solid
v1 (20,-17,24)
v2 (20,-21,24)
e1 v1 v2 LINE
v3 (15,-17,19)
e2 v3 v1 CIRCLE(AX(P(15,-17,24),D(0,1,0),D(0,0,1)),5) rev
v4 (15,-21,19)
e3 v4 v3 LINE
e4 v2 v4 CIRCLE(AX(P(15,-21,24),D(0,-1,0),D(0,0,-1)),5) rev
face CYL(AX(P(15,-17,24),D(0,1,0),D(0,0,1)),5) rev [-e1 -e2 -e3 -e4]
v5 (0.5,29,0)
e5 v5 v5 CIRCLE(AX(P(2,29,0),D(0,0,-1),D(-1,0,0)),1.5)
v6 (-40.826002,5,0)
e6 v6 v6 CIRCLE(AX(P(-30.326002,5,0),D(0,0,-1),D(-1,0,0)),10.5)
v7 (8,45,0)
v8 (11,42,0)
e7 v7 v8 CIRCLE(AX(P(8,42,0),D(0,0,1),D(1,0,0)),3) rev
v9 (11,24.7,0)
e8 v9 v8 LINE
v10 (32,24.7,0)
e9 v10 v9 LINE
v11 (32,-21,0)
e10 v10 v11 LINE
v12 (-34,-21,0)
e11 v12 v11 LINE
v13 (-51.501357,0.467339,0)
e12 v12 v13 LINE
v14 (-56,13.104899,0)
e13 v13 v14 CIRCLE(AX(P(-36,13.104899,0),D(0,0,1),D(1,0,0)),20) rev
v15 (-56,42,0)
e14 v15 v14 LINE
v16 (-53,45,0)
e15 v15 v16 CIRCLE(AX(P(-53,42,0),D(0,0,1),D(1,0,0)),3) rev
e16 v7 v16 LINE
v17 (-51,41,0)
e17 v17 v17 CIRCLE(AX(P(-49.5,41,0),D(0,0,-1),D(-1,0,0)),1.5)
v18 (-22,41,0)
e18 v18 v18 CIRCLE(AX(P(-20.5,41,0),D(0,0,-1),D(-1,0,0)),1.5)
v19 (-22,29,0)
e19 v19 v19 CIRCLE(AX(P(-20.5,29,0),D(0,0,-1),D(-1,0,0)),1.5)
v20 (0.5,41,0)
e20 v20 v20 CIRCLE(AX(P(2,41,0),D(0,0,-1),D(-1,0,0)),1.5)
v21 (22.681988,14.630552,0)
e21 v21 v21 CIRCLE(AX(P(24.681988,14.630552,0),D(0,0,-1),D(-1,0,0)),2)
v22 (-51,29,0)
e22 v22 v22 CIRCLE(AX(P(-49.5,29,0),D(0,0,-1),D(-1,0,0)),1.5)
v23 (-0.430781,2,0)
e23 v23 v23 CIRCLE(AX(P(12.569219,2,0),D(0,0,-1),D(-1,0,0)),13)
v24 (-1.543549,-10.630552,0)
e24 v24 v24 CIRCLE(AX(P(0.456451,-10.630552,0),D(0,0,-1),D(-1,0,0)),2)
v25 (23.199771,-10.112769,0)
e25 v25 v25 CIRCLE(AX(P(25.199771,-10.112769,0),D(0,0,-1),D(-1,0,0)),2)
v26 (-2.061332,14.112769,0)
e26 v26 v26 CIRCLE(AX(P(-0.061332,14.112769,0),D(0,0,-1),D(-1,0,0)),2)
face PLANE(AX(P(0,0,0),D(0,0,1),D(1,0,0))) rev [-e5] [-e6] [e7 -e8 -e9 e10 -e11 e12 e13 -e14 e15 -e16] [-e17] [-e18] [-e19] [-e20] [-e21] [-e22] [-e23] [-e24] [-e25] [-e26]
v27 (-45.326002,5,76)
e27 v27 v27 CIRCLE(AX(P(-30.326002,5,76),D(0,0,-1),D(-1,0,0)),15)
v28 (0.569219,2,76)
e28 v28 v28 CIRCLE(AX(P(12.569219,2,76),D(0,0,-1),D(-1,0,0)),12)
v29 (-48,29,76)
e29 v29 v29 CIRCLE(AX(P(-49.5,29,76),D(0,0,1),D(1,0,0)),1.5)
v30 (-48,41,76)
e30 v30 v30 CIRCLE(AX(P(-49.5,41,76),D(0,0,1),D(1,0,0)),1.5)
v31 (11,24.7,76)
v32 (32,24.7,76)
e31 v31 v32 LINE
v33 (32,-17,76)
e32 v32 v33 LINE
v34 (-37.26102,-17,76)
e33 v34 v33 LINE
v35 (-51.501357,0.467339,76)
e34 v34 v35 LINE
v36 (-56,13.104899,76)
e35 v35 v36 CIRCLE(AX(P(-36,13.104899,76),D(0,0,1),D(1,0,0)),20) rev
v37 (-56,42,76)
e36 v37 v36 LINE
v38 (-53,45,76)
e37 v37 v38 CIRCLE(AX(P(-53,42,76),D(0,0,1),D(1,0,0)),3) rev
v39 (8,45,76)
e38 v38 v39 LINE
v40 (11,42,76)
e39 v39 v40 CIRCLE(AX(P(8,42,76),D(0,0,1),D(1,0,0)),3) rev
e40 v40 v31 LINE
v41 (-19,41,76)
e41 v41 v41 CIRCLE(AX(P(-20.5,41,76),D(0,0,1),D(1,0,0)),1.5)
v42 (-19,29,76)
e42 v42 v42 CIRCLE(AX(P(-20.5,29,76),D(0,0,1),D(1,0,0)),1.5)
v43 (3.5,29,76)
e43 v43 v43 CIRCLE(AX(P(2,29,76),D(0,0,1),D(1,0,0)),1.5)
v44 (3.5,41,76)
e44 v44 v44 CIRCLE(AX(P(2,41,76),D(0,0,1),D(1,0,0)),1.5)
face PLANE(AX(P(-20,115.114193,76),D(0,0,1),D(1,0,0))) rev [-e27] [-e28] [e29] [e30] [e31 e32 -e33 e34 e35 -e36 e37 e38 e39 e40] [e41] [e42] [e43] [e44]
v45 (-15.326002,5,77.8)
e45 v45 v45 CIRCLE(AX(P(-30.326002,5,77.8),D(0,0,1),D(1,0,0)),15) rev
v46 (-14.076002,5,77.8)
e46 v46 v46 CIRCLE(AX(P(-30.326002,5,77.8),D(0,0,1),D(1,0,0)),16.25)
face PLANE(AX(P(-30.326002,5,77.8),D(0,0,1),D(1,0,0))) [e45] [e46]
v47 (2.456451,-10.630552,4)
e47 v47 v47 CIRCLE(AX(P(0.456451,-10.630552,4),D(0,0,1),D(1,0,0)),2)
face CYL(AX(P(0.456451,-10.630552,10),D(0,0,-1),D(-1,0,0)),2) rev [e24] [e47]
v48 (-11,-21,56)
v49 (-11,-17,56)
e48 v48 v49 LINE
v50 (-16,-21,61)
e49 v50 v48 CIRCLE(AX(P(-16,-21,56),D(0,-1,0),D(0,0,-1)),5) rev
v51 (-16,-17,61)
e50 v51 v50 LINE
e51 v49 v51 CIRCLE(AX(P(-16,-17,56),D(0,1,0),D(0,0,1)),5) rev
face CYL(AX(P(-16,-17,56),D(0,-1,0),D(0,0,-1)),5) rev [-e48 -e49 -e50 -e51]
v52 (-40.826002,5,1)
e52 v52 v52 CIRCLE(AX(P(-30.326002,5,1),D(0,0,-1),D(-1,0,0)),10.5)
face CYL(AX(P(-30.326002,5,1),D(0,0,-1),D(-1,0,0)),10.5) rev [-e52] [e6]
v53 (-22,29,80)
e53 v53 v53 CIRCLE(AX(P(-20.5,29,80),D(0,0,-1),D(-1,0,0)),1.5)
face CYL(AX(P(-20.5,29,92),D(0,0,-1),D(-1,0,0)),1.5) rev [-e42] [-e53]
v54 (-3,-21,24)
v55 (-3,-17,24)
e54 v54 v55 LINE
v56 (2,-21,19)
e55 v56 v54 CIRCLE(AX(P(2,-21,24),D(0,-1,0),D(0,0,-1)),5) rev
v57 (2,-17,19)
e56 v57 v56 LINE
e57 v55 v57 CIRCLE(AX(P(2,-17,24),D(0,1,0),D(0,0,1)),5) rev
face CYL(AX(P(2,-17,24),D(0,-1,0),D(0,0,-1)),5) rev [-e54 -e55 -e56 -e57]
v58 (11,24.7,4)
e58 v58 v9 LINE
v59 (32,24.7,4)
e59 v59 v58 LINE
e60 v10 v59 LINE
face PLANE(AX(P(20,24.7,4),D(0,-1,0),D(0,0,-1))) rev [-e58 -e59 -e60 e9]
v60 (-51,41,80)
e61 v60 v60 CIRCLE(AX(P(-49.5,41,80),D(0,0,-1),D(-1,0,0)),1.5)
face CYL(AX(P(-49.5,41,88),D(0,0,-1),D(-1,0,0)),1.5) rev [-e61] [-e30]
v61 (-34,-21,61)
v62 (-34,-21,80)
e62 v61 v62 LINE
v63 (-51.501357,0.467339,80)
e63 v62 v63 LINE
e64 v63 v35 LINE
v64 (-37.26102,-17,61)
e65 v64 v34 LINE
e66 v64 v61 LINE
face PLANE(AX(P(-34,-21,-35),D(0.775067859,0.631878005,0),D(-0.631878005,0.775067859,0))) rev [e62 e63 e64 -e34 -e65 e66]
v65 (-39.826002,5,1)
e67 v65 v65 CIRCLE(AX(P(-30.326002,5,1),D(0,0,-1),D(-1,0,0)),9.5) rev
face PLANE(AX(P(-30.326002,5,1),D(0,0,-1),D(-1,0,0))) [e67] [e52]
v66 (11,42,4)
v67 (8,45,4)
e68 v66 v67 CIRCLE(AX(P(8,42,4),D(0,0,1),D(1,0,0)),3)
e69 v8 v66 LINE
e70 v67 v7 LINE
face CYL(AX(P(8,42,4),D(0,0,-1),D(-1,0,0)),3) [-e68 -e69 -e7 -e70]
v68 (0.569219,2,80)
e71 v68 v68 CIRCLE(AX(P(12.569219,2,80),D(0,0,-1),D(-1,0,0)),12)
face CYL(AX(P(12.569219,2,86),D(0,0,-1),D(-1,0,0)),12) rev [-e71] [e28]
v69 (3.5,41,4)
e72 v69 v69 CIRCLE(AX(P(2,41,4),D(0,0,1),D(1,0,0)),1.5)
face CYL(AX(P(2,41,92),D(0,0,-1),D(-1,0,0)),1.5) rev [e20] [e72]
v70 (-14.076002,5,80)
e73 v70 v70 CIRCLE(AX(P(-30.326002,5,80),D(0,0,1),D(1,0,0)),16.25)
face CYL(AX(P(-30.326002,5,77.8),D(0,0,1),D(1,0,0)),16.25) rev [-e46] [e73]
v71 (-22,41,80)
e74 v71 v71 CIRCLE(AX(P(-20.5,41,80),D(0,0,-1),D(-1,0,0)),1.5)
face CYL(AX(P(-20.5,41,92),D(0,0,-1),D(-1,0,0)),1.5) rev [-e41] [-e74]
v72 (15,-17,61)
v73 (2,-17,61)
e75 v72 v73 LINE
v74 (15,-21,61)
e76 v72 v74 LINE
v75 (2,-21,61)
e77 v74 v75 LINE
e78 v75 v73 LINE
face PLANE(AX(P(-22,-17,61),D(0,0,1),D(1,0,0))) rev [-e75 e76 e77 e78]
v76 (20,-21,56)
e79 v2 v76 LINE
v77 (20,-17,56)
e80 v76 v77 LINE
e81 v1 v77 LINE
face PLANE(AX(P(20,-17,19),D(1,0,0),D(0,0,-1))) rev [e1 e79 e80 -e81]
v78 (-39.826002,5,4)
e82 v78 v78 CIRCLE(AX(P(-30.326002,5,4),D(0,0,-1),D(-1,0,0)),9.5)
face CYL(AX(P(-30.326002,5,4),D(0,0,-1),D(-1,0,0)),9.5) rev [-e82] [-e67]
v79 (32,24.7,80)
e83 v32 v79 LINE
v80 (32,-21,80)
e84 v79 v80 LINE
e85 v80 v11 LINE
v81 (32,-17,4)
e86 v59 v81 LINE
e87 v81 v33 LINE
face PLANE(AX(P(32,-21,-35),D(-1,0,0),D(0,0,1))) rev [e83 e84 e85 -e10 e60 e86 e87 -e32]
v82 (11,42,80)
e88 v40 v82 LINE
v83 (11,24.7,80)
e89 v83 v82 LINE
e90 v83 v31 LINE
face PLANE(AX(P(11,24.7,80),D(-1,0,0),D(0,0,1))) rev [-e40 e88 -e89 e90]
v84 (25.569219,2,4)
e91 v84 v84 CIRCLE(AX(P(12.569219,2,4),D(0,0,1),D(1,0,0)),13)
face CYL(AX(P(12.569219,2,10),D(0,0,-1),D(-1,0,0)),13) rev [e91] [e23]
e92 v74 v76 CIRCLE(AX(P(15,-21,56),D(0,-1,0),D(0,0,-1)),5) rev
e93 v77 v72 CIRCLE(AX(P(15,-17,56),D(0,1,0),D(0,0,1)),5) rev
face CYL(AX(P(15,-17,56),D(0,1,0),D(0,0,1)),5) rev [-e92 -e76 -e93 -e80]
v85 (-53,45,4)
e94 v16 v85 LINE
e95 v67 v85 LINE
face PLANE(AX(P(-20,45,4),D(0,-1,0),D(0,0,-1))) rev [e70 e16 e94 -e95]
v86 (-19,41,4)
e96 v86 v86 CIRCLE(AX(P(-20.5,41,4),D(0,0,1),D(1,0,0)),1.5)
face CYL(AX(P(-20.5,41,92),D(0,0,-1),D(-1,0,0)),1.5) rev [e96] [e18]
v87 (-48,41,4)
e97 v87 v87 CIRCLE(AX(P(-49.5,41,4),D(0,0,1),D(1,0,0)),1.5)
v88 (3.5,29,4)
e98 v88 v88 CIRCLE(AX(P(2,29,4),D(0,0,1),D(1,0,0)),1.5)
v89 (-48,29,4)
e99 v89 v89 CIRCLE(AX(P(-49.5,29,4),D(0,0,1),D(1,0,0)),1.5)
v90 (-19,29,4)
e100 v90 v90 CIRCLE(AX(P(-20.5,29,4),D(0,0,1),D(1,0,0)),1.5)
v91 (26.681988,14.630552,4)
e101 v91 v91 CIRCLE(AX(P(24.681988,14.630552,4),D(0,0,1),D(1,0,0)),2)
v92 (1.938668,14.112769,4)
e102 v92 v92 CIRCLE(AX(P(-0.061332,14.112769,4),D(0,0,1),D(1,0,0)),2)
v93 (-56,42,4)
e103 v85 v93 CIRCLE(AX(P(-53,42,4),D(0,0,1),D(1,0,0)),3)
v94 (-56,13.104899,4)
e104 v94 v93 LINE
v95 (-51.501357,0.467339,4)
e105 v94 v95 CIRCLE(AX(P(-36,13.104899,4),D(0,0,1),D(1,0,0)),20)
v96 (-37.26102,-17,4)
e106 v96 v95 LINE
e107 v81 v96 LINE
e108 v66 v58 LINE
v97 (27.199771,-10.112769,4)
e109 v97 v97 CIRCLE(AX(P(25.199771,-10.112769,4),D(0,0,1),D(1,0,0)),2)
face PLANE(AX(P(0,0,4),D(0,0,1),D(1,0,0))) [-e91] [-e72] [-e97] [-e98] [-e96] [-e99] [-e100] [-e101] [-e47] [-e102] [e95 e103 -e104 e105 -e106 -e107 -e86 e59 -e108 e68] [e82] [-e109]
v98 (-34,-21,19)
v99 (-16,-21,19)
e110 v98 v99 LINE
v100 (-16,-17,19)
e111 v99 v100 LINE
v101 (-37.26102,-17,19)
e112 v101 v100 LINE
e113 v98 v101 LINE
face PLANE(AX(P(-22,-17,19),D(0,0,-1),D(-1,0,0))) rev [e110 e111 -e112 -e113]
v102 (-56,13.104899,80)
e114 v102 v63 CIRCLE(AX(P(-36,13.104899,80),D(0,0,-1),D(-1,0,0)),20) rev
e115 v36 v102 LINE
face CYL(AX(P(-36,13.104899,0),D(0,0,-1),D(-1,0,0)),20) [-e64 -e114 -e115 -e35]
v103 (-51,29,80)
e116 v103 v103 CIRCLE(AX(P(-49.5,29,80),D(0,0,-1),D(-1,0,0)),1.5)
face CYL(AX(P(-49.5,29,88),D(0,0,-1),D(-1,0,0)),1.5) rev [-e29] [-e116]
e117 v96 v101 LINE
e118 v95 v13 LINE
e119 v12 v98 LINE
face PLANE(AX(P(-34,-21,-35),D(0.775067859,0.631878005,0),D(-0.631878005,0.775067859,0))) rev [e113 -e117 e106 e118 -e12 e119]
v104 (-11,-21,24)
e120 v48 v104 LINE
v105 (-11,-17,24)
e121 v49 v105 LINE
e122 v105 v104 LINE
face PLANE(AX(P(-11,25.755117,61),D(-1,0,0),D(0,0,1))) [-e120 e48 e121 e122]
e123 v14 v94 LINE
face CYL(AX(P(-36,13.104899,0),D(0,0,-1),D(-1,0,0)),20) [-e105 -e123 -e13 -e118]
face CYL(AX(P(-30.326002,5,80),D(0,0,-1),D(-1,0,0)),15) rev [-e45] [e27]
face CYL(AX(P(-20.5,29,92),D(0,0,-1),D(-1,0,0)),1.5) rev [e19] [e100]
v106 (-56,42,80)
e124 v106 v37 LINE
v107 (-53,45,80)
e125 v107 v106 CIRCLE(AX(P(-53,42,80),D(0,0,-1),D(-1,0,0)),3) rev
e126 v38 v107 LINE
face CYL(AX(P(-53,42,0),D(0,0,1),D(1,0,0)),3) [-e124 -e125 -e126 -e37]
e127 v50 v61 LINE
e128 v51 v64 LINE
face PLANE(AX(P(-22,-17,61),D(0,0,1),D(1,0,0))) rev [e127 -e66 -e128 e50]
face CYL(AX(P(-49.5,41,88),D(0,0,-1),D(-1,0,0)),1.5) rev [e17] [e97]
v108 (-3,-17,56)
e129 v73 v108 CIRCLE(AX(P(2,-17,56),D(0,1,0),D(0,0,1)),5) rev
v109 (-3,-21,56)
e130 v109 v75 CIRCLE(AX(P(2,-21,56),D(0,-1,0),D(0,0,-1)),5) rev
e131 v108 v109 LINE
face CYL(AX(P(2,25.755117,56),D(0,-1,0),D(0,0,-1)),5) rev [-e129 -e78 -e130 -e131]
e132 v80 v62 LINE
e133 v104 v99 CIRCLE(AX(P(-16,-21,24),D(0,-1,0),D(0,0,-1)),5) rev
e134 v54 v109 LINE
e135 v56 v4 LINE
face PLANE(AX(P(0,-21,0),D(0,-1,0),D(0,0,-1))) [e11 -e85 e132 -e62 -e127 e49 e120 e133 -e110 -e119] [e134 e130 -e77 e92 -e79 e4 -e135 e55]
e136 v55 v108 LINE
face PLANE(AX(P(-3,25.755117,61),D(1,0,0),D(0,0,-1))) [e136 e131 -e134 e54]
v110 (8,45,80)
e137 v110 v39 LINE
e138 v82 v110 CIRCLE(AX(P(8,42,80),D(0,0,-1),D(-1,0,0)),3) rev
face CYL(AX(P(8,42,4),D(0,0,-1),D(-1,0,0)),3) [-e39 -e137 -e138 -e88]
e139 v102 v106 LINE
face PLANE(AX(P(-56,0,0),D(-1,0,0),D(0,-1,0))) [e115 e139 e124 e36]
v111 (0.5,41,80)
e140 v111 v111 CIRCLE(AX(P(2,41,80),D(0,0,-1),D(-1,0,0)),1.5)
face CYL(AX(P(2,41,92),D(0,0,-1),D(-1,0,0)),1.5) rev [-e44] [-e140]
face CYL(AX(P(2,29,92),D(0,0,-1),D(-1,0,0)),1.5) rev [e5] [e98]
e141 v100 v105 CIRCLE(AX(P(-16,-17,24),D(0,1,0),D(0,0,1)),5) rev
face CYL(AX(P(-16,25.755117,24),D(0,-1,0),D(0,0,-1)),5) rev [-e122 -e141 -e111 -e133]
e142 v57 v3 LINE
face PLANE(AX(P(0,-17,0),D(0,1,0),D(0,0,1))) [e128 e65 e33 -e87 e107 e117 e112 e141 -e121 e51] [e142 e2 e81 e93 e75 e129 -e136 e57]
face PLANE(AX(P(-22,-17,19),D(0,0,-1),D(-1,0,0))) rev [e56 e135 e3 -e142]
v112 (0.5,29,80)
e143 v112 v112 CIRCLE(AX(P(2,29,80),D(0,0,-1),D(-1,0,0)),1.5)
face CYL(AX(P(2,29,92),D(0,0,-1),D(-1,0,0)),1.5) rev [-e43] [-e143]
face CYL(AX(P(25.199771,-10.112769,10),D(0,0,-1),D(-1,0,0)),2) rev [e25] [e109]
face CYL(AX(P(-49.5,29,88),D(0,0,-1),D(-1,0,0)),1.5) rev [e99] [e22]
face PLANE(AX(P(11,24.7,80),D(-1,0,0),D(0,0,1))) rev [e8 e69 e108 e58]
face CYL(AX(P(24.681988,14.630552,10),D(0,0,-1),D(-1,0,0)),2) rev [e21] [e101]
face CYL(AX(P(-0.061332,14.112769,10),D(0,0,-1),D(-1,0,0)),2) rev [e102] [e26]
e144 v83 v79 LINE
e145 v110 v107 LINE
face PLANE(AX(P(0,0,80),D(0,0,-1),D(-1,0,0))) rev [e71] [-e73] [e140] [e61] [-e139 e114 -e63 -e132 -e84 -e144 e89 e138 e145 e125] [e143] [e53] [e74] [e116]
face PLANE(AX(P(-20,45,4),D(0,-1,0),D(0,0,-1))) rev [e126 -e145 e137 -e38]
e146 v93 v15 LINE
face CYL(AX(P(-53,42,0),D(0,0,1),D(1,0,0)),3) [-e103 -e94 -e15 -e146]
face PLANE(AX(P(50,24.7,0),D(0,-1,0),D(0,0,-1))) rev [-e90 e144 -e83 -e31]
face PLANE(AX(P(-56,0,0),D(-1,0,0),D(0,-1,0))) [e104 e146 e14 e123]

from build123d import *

# Parameters (mm, degrees)
EXTRUDE_1_DEPTH      = 4
SKETCH_3_W           = 70
SKETCH_3_H           = 4
EXTRUDE_2_DEPTH      = 5
SKETCH_4_W           = 70
SKETCH_4_H           = 4
EXTRUDE_3_DEPTH      = 4
SKETCH_4_2_W         = 70
SKETCH_4_2_H         = 4
EXTRUDE_4_DEPTH      = 81
EXTRUDE_5_DEPTH      = 4
SKETCH_6_W           = 70
SKETCH_6_H           = 4
EXTRUDE_6_DEPTH      = 76
SKETCH_7_W           = 70
SKETCH_7_H           = 4
EXTRUDE_7_DEPTH      = 95
SKETCH_8_W           = 30
SKETCH_8_H           = 20.3
CUT_EXTRUDE_2_DEPTH  = 80
SKETCH_11_W          = 70
SKETCH_11_H          = 99
CUT_EXTRUDE_4_DEPTH  = 155
SKETCH_14_W          = 5
SKETCH_14_H          = 99
CUT_EXTRUDE_7_DEPTH  = 81.8
SKETCH_15_W          = 65
SKETCH_15_H          = 72
EXTRUDE_8_DEPTH      = 8
SKETCH_16_W          = 65
SKETCH_16_H          = 80
CUT_EXTRUDE_8_DEPTH  = 8
SKETCH_17_W          = 6
SKETCH_17_H          = 70.7
CUT_EXTRUDE_9_DEPTH  = 102
FILLET_2_R           = 3
EXTRUDE_10_DEPTH     = 33
SKETCH_22_R          = 9.5
CUT_EXTRUDE_12_DEPTH = 333
SKETCH_23_R          = 10.5
CUT_EXTRUDE_13_DEPTH = 1
SKETCH_25_R          = 1.5
CUT_EXTRUDE_15_DEPTH = 92
EXTRUDE_11_DEPTH     = 8
SKETCH_27_R          = 1.5
CUT_EXTRUDE_16_DEPTH = 88
SKETCH_28_R          = 1.5
EXTRUDE_12_DEPTH     = 4
EXTRUDE_START        = -4
SKETCH_30_R          = 1.5
EXTRUDE_13_DEPTH     = 4
FILLET_3_R           = 3
SKETCH_34_R          = 15
CUT_EXTRUDE_19_DEPTH = 10
SKETCH_46_W          = 100
SKETCH_46_H          = 72
EXTRUDE_14_DEPTH     = 14
SKETCH_47_W          = 100
SKETCH_47_H          = 80
CUT_EXTRUDE_26_DEPTH = 14
SKETCH_48_W          = 4
SKETCH_48_H          = 56.7
CUT_EXTRUDE_27_DEPTH = 97
FILLET_4_R           = 3
CUT_EXTRUDE_28_DEPTH = 82
SKETCH_51_W          = 36
SKETCH_51_H          = 36
CUT_EXTRUDE_29_DEPTH = 82
FILLET_6_R           = 5
SKETCH_52_R          = 13
SKETCH_52_R_2        = 2
CUT_EXTRUDE_30_DEPTH = 10
SKETCH_53_R          = 12
CUT_EXTRUDE_31_DEPTH = 10
SKETCH_54_W          = 74.594594595
SKETCH_54_H          = 72
EXTRUDE_15_DEPTH     = 11
SKETCH_55_W          = 72
SKETCH_55_H          = 80
CUT_EXTRUDE_32_DEPTH = 11
SKETCH_57_W          = 80
SKETCH_57_H          = 11
CUT_EXTRUDE_33_DEPTH = 14
SKETCH_58_W          = 8
SKETCH_58_H          = 45.7
CUT_EXTRUDE_34_DEPTH = 115
CUT_EXTRUDE_35_DEPTH = 115
EXTRUDE_16_DEPTH     = 80
FILLET_7_R           = 20
SKETCH_61_W          = 42
SKETCH_61_H          = 42
CUT_EXTRUDE_36_DEPTH = 4
SKETCH_63_W          = 9
SKETCH_63_H          = 20.3
CUT_EXTRUDE_37_DEPTH = 108.522090753
FILLET_9_R           = 3
SKETCH_65_R          = 9.5
EXTRUDE_17_DEPTH     = 4
SKETCH_66_R          = 15
EXTRUDE_18_DEPTH     = 4
SKETCH_67_R          = 9.5
CUT_EXTRUDE_39_DEPTH = 4
SKETCH_68_R          = 15
CUT_EXTRUDE_40_DEPTH = 4
SKETCH_69_R          = 10.5
CUT_EXTRUDE_41_DEPTH = 1
SKETCH_70_R          = 16.25
CUT_EXTRUDE_42_DEPTH = 2.2
SKETCH_71_W          = 22.207028064
SKETCH_71_H          = 42
CUT_EXTRUDE_44_DEPTH = 8.2
SKETCH_72_W          = 8
SKETCH_72_H          = 42
EXTRUDE_19_DEPTH     = 4
FILLET_10_R          = 5


with BuildPart() as part:
    # 草图1 → 凸台-拉伸1 (new body)
    with BuildSketch(Plane.XY):
        Polygon((-20, 45), (20, 45), (20, 24.7), (50, 24.7), (50, -45), (20, -45), (-20, -45), align=None)
    extrude(amount=EXTRUDE_1_DEPTH)

    # 草图3 → 凸台-拉伸2 (add)
    with BuildSketch(Plane.XZ.offset(45)):
        with Locations((15, 2)):
            Rectangle(SKETCH_3_W, SKETCH_3_H)
    extrude(amount=EXTRUDE_2_DEPTH)

    # 草图4 → 凸台-拉伸3 (add)
    with BuildSketch(Plane(origin=(0, 0, 0), x_dir=(-1, 0, 0), z_dir=(0, 0, -1))):
        with Locations((-15, -52)):
            Rectangle(SKETCH_4_W, SKETCH_4_H)
    extrude(amount=-EXTRUDE_3_DEPTH)

    # 草图4<2> → 凸台-拉伸4 (add)
    with BuildSketch(Plane(origin=(0, 0, 0), x_dir=(-1, 0, 0), z_dir=(0, 0, -1))):
        with Locations((-15, -52)):
            Rectangle(SKETCH_4_2_W, SKETCH_4_2_H)
    extrude(amount=EXTRUDE_4_DEPTH)

    # 草图5 → 凸台-拉伸5 (add)
    with BuildSketch(Plane(origin=(0, 0, -81), x_dir=(-1, 0, 0), z_dir=(0, 0, -1))):
        Polygon((-50, -50), (-50, -54), (20, -54), (20, -50), (20, 45), (-20, 45), (-20, 24.7), (-50, 24.7), align=None)
    extrude(amount=EXTRUDE_5_DEPTH)

    # 草图6 → 凸台-拉伸6 (add)
    with BuildSketch(Plane.XY.offset(4)):
        with Locations((15, -52)):
            Rectangle(SKETCH_6_W, SKETCH_6_H)
    extrude(amount=EXTRUDE_6_DEPTH)

    # 草图7 → 凸台-拉伸7 (add)
    with BuildSketch(Plane(origin=(0, -50, 0), x_dir=(1, 0, 0), z_dir=(0, 1, 0))):
        with Locations((15, -78)):
            Rectangle(SKETCH_7_W, SKETCH_7_H)
    extrude(amount=EXTRUDE_7_DEPTH)

    # 草图8 → 切除-拉伸2 (cut)
    with BuildSketch(Plane.XY.offset(80)):
        with Locations((35, 34.85)):
            Rectangle(SKETCH_8_W, SKETCH_8_H)
    extrude(amount=-CUT_EXTRUDE_2_DEPTH, mode=Mode.SUBTRACT)

    # 草图11 → 切除-拉伸4 (cut)
    with BuildSketch(Plane(origin=(0, 0, 0), x_dir=(-1, 0, 0), z_dir=(0, 0, -1))):
        with Locations((-15, -4.5)):
            Rectangle(SKETCH_11_W, SKETCH_11_H)
    extrude(amount=CUT_EXTRUDE_4_DEPTH, mode=Mode.SUBTRACT)

    # 草图14 → 切除-拉伸7 (cut)
    with BuildSketch(Plane.XY.offset(80)):
        with Locations((-17.5, -4.5)):
            Rectangle(SKETCH_14_W, SKETCH_14_H)
    extrude(amount=-CUT_EXTRUDE_7_DEPTH, mode=Mode.SUBTRACT)

    # 草图15 → 凸台-拉伸8 (add)
    with BuildSketch(Plane(origin=(0, -50, 0), x_dir=(1, 0, 0), z_dir=(0, 1, 0))):
        with Locations((17.5, -40)):
            Rectangle(SKETCH_15_W, SKETCH_15_H)
    extrude(amount=EXTRUDE_8_DEPTH)

    # 草图16 → 切除-拉伸8 (cut)
    with BuildSketch(Plane.XZ.offset(54)):
        with Locations((17.5, 40)):
            Rectangle(SKETCH_16_W, SKETCH_16_H)
    extrude(amount=-CUT_EXTRUDE_8_DEPTH, mode=Mode.SUBTRACT)

    # 草图17 → 切除-拉伸9 (cut)
    with BuildSketch(Plane(origin=(0, 0, 0), x_dir=(-1, 0, 0), z_dir=(0, 0, -1))):
        with Locations((-47, -10.65)):
            Rectangle(SKETCH_17_W, SKETCH_17_H)
    extrude(amount=-CUT_EXTRUDE_9_DEPTH, mode=Mode.SUBTRACT)

    # 圆角2
    fillet_2_edges = [part.edges().sort_by_distance(p)[0] for p in [
        (44, 24.7, 78),
        (44, 24.7, 2),
    ]]
    fillet(fillet_2_edges, radius=FILLET_2_R)

    # 草图21 → 凸台-拉伸10 (add)
    with BuildSketch(Plane.ZY.offset(15)):
        Polygon((0, -46), (80, -46), (80, 45), (76, 45), (76, -42), (4, -42), (4, 45), (0, 45), align=None)
    extrude(amount=EXTRUDE_10_DEPTH)

    # 草图22 → 切除-拉伸12 (cut)
    with BuildSketch(Plane.XY.offset(80)):
        with Locations((-29, 13)):
            Circle(SKETCH_22_R)
    extrude(amount=-CUT_EXTRUDE_12_DEPTH, mode=Mode.SUBTRACT)

    # 草图23 → 切除-拉伸13 (cut)
    with BuildSketch(Plane.XY.offset(80)):
        with Locations((-29, 13)):
            Circle(SKETCH_23_R)
    extrude(amount=-CUT_EXTRUDE_13_DEPTH, mode=Mode.SUBTRACT)

    # 草图25 → 切除-拉伸15 (cut)
    with BuildSketch(Plane(origin=(0, 0, 0), x_dir=(-1, 0, 0), z_dir=(0, 0, -1))):
        with Locations((-2, 41)):
            Circle(SKETCH_25_R)
        with Locations((-2, 29)):
            Circle(SKETCH_25_R)
        with Locations((43, 41)):
            Circle(SKETCH_25_R)
        with Locations((43, 29)):
            Circle(SKETCH_25_R)
        with Locations((20.5, 41)):
            Circle(SKETCH_25_R)
        with Locations((20.5, 29)):
            Circle(SKETCH_25_R)
    extrude(amount=-CUT_EXTRUDE_15_DEPTH, mode=Mode.SUBTRACT)

    # 草图26 → 凸台-拉伸11 (add)
    with BuildSketch(Plane.ZY.offset(48)):
        Polygon((0, 45), (0, -46), (80, -46), (80, 45), (76, 45), (76, -42), (4, -42), (4, 45), align=None)
    extrude(amount=EXTRUDE_11_DEPTH)

    # 草图27 → 切除-拉伸16 (cut)
    with BuildSketch(Plane(origin=(0, 0, 0), x_dir=(-1, 0, 0), z_dir=(0, 0, -1))):
        with Locations((49.5, 41)):
            Circle(SKETCH_27_R)
        with Locations((49.5, 29)):
            Circle(SKETCH_27_R)
    extrude(amount=-CUT_EXTRUDE_16_DEPTH, mode=Mode.SUBTRACT)

    # 草图28 → 凸台-拉伸12 (add)
    with BuildSketch(Plane(origin=(0, 0, 0), x_dir=(-1, 0, 0), z_dir=(0, 0, -1))):
        with Locations((43, 41)):
            Circle(SKETCH_28_R)
        with Locations((43, 29)):
            Circle(SKETCH_28_R)
    extrude(amount=-EXTRUDE_12_DEPTH)

    # 草图30 → 凸台-拉伸13 (add)
    with BuildSketch(Plane.XY.offset(80).offset(EXTRUDE_START)):
        with Locations((-43, 41)):
            Circle(SKETCH_30_R)
        with Locations((-43, 29)):
            Circle(SKETCH_30_R)
    extrude(amount=EXTRUDE_13_DEPTH)

    # 圆角3
    fillet_3_edges = [part.edges().sort_by_distance(p)[0] for p in [
        (20, 45, 78),
        (20, 45, 2),
        (-56, 45, 2),
        (-56, 45, 78),
    ]]
    fillet(fillet_3_edges, radius=FILLET_3_R)

    # 草图34 → 切除-拉伸19 (cut)
    with BuildSketch(Plane.XY.offset(80)):
        with Locations((-29, 13)):
            Circle(SKETCH_34_R)
    extrude(amount=-CUT_EXTRUDE_19_DEPTH, mode=Mode.SUBTRACT)

    # 草图46 → 凸台-拉伸14 (add)
    with BuildSketch(Plane(origin=(0, -42, 0), x_dir=(1, 0, 0), z_dir=(0, 1, 0))):
        with Locations((-6, -40)):
            Rectangle(SKETCH_46_W, SKETCH_46_H)
    extrude(amount=EXTRUDE_14_DEPTH)

    # 草图47 → 切除-拉伸26 (cut)
    with BuildSketch(Plane.XZ.offset(46)):
        with Locations((-6, 40)):
            Rectangle(SKETCH_47_W, SKETCH_47_H)
    extrude(amount=-CUT_EXTRUDE_26_DEPTH, mode=Mode.SUBTRACT)

    # 草图48 → 切除-拉伸27 (cut)
    with BuildSketch(Plane(origin=(0, 0, 0), x_dir=(-1, 0, 0), z_dir=(0, 0, -1))):
        with Locations((-42, -3.65)):
            Rectangle(SKETCH_48_W, SKETCH_48_H)
    extrude(amount=-CUT_EXTRUDE_27_DEPTH, mode=Mode.SUBTRACT)

    # 圆角4
    fillet_4_edges = [part.edges().sort_by_distance(p)[0] for p in [
        (40, 24.7, 78),
        (40, 24.7, 2),
    ]]
    fillet(fillet_4_edges, radius=FILLET_4_R)

    # 草图49 → 切除-拉伸28 (cut)
    with BuildSketch(Plane.XY.offset(80)):
        Polygon((-56, -32), (-32, -32), (-56, 5), align=None)
    extrude(amount=-CUT_EXTRUDE_28_DEPTH, mode=Mode.SUBTRACT)

    # 草图51 → 切除-拉伸29 (cut)
    with BuildSketch(Plane.XZ.offset(32)):
        with Locations((4, 40)):
            Rectangle(SKETCH_51_W, SKETCH_51_H)
    extrude(amount=-CUT_EXTRUDE_29_DEPTH, mode=Mode.SUBTRACT)

    # 圆角6
    fillet_6_edges = [part.edges().sort_by_distance(p)[0] for p in [
        (22, -30, 58),
        (22, -30, 22),
        (-14, -30, 22),
        (-14, -30, 58),
    ]]
    fillet(fillet_6_edges, radius=FILLET_6_R)

    # 草图52 → 切除-拉伸30 (cut)
    with BuildSketch(Plane(origin=(0, 0, 0), x_dir=(-1, 0, 0), z_dir=(0, 0, -1))):
        with Locations((-12.569219382, 2)):
            Circle(SKETCH_52_R)
        with Locations((0.061332194, 14.112768754)):
            Circle(SKETCH_52_R_2)
        with Locations((-0.456450627, -10.630551576)):
            Circle(SKETCH_52_R_2)
        with Locations((-25.199770957, -10.112768754)):
            Circle(SKETCH_52_R_2)
        with Locations((-24.681988136, 14.630551576)):
            Circle(SKETCH_52_R_2)
    extrude(amount=-CUT_EXTRUDE_30_DEPTH, mode=Mode.SUBTRACT)

    # 草图53 → 切除-拉伸31 (cut)
    with BuildSketch(Plane(origin=(0, 0, 76), x_dir=(-1, 0, 0), z_dir=(0, 0, -1))):
        with Locations((-12.569219382, 2)):
            Circle(SKETCH_53_R)
    extrude(amount=-CUT_EXTRUDE_31_DEPTH, mode=Mode.SUBTRACT)

    # 草图54 → 凸台-拉伸15 (add)
    with BuildSketch(Plane(origin=(0, -28, 0), x_dir=(1, 0, 0), z_dir=(0, 1, 0))):
        with Locations((2.702702702, -40)):
            Rectangle(SKETCH_54_W, SKETCH_54_H)
    extrude(amount=EXTRUDE_15_DEPTH)

    # 草图55 → 切除-拉伸32 (cut)
    with BuildSketch(Plane.XZ.offset(32)):
        with Locations((4, 40)):
            Rectangle(SKETCH_55_W, SKETCH_55_H)
    extrude(amount=-CUT_EXTRUDE_32_DEPTH, mode=Mode.SUBTRACT)

    # 草图57 → 切除-拉伸33 (cut)
    with BuildSketch(Plane(origin=(-32, 0, 0), x_dir=(0, 0, -1), z_dir=(1, 0, 0))):
        with Locations((-40, -26.5)):
            Rectangle(SKETCH_57_W, SKETCH_57_H)
    extrude(amount=-CUT_EXTRUDE_33_DEPTH, mode=Mode.SUBTRACT)

    # 草图58 → 切除-拉伸34 (cut)
    with BuildSketch(Plane.XY.offset(80)):
        with Locations((36, 1.85)):
            Rectangle(SKETCH_58_W, SKETCH_58_H)
    extrude(amount=-CUT_EXTRUDE_34_DEPTH, mode=Mode.SUBTRACT)

    # 草图59 → 切除-拉伸35 (cut)
    with BuildSketch(Plane.XY.offset(80)):
        Polygon((-34, -21), (-56, 5.985419262), (-56, -21), align=None)
    extrude(amount=-CUT_EXTRUDE_35_DEPTH, mode=Mode.SUBTRACT)

    # 凸台-拉伸16: read off the stored shape, not the designer's step
    # 凸台-拉伸16 outline → 凸台-拉伸16 (add)
    with BuildSketch(Plane.XY):
        Polygon((-37.261020299, -17), (-34.594594595, -20.270664344), (-34.594594595, -17), align=None)
    extrude(amount=EXTRUDE_16_DEPTH)

    # 圆角7
    fillet_7_edges = [part.edges().sort_by_distance(p)[0] for p in [
        (-56, 5.985419262, 2),
        (-56, 5.985419262, 78),
    ]]
    fillet(fillet_7_edges, radius=FILLET_7_R)

    # 草图61 → 切除-拉伸36 (cut)
    with BuildSketch(Plane.XZ.offset(21)):
        with Locations((-1, 40)):
            Rectangle(SKETCH_61_W, SKETCH_61_H)
    extrude(amount=-CUT_EXTRUDE_36_DEPTH, mode=Mode.SUBTRACT)

    # 草图63 → 切除-拉伸37 (cut, through all)
    with BuildSketch(Plane(origin=(0, 0, 0), x_dir=(-1, 0, 0), z_dir=(0, 0, -1))):
        with Locations((-15.5, 34.85)):
            Rectangle(SKETCH_63_W, SKETCH_63_H)
    extrude(amount=-CUT_EXTRUDE_37_DEPTH, mode=Mode.SUBTRACT)

    # 圆角9
    fillet_9_edges = [part.edges().sort_by_distance(p)[0] for p in [
        (11, 45, 78),
        (11, 45, 2),
    ]]
    fillet(fillet_9_edges, radius=FILLET_9_R)

    # 草图65 → 凸台-拉伸17 (add)
    with BuildSketch(Plane(origin=(0, 0, 0), x_dir=(-1, 0, 0), z_dir=(0, 0, -1)).offset(EXTRUDE_START)):
        with Locations((29, 13)):
            Circle(SKETCH_65_R)
    extrude(amount=EXTRUDE_17_DEPTH)

    # 草图66 → 凸台-拉伸18 (add)
    with BuildSketch(Plane.XY.offset(80)):
        with Locations((-29, 13)):
            Circle(SKETCH_66_R)
    extrude(amount=-EXTRUDE_18_DEPTH)

    # 草图67 → 切除-拉伸39 (cut)
    with BuildSketch(Plane(origin=(0, 0, 0), x_dir=(-1, 0, 0), z_dir=(0, 0, -1))):
        with Locations((30.326001797, 5)):
            Circle(SKETCH_67_R)
    extrude(amount=-CUT_EXTRUDE_39_DEPTH, mode=Mode.SUBTRACT)

    # 草图68 → 切除-拉伸40 (cut)
    with BuildSketch(Plane(origin=(0, 0, 76), x_dir=(-1, 0, 0), z_dir=(0, 0, -1))):
        with Locations((30.326001797, 5)):
            Circle(SKETCH_68_R)
    extrude(amount=-CUT_EXTRUDE_40_DEPTH, mode=Mode.SUBTRACT)

    # 草图69 → 切除-拉伸41 (cut)
    with BuildSketch(Plane(origin=(0, 0, 0), x_dir=(-1, 0, 0), z_dir=(0, 0, -1))):
        with Locations((30.326001797, 5)):
            Circle(SKETCH_69_R)
    extrude(amount=-CUT_EXTRUDE_41_DEPTH, mode=Mode.SUBTRACT)

    # 草图70 → 切除-拉伸42 (cut)
    with BuildSketch(Plane.XY.offset(80)):
        with Locations((-30.326001797, 5)):
            Circle(SKETCH_70_R)
    extrude(amount=-CUT_EXTRUDE_42_DEPTH, mode=Mode.SUBTRACT)

    # 草图71 → 切除-拉伸44 (cut)
    with BuildSketch(Plane.XZ.offset(21)):
        with Locations((-33.103514032, 40)):
            Rectangle(SKETCH_71_W, SKETCH_71_H)
    extrude(amount=-CUT_EXTRUDE_44_DEPTH, mode=Mode.SUBTRACT)

    # 草图72 → 凸台-拉伸19 (add)
    with BuildSketch(Plane.XZ.offset(21)):
        with Locations((-7, 40)):
            Rectangle(SKETCH_72_W, SKETCH_72_H)
    extrude(amount=-EXTRUDE_19_DEPTH)

    # 圆角10
    fillet_10_edges = [part.edges().sort_by_distance(p)[0] for p in [
        (20, -19, 61),
        (20, -19, 19),
        (-11, -19, 61),
        (-11, -19, 19),
        (-3, -19, 19),
        (-3, -19, 61),
    ]]
    fillet(fillet_10_edges, radius=FILLET_10_R)


solid = part.part
